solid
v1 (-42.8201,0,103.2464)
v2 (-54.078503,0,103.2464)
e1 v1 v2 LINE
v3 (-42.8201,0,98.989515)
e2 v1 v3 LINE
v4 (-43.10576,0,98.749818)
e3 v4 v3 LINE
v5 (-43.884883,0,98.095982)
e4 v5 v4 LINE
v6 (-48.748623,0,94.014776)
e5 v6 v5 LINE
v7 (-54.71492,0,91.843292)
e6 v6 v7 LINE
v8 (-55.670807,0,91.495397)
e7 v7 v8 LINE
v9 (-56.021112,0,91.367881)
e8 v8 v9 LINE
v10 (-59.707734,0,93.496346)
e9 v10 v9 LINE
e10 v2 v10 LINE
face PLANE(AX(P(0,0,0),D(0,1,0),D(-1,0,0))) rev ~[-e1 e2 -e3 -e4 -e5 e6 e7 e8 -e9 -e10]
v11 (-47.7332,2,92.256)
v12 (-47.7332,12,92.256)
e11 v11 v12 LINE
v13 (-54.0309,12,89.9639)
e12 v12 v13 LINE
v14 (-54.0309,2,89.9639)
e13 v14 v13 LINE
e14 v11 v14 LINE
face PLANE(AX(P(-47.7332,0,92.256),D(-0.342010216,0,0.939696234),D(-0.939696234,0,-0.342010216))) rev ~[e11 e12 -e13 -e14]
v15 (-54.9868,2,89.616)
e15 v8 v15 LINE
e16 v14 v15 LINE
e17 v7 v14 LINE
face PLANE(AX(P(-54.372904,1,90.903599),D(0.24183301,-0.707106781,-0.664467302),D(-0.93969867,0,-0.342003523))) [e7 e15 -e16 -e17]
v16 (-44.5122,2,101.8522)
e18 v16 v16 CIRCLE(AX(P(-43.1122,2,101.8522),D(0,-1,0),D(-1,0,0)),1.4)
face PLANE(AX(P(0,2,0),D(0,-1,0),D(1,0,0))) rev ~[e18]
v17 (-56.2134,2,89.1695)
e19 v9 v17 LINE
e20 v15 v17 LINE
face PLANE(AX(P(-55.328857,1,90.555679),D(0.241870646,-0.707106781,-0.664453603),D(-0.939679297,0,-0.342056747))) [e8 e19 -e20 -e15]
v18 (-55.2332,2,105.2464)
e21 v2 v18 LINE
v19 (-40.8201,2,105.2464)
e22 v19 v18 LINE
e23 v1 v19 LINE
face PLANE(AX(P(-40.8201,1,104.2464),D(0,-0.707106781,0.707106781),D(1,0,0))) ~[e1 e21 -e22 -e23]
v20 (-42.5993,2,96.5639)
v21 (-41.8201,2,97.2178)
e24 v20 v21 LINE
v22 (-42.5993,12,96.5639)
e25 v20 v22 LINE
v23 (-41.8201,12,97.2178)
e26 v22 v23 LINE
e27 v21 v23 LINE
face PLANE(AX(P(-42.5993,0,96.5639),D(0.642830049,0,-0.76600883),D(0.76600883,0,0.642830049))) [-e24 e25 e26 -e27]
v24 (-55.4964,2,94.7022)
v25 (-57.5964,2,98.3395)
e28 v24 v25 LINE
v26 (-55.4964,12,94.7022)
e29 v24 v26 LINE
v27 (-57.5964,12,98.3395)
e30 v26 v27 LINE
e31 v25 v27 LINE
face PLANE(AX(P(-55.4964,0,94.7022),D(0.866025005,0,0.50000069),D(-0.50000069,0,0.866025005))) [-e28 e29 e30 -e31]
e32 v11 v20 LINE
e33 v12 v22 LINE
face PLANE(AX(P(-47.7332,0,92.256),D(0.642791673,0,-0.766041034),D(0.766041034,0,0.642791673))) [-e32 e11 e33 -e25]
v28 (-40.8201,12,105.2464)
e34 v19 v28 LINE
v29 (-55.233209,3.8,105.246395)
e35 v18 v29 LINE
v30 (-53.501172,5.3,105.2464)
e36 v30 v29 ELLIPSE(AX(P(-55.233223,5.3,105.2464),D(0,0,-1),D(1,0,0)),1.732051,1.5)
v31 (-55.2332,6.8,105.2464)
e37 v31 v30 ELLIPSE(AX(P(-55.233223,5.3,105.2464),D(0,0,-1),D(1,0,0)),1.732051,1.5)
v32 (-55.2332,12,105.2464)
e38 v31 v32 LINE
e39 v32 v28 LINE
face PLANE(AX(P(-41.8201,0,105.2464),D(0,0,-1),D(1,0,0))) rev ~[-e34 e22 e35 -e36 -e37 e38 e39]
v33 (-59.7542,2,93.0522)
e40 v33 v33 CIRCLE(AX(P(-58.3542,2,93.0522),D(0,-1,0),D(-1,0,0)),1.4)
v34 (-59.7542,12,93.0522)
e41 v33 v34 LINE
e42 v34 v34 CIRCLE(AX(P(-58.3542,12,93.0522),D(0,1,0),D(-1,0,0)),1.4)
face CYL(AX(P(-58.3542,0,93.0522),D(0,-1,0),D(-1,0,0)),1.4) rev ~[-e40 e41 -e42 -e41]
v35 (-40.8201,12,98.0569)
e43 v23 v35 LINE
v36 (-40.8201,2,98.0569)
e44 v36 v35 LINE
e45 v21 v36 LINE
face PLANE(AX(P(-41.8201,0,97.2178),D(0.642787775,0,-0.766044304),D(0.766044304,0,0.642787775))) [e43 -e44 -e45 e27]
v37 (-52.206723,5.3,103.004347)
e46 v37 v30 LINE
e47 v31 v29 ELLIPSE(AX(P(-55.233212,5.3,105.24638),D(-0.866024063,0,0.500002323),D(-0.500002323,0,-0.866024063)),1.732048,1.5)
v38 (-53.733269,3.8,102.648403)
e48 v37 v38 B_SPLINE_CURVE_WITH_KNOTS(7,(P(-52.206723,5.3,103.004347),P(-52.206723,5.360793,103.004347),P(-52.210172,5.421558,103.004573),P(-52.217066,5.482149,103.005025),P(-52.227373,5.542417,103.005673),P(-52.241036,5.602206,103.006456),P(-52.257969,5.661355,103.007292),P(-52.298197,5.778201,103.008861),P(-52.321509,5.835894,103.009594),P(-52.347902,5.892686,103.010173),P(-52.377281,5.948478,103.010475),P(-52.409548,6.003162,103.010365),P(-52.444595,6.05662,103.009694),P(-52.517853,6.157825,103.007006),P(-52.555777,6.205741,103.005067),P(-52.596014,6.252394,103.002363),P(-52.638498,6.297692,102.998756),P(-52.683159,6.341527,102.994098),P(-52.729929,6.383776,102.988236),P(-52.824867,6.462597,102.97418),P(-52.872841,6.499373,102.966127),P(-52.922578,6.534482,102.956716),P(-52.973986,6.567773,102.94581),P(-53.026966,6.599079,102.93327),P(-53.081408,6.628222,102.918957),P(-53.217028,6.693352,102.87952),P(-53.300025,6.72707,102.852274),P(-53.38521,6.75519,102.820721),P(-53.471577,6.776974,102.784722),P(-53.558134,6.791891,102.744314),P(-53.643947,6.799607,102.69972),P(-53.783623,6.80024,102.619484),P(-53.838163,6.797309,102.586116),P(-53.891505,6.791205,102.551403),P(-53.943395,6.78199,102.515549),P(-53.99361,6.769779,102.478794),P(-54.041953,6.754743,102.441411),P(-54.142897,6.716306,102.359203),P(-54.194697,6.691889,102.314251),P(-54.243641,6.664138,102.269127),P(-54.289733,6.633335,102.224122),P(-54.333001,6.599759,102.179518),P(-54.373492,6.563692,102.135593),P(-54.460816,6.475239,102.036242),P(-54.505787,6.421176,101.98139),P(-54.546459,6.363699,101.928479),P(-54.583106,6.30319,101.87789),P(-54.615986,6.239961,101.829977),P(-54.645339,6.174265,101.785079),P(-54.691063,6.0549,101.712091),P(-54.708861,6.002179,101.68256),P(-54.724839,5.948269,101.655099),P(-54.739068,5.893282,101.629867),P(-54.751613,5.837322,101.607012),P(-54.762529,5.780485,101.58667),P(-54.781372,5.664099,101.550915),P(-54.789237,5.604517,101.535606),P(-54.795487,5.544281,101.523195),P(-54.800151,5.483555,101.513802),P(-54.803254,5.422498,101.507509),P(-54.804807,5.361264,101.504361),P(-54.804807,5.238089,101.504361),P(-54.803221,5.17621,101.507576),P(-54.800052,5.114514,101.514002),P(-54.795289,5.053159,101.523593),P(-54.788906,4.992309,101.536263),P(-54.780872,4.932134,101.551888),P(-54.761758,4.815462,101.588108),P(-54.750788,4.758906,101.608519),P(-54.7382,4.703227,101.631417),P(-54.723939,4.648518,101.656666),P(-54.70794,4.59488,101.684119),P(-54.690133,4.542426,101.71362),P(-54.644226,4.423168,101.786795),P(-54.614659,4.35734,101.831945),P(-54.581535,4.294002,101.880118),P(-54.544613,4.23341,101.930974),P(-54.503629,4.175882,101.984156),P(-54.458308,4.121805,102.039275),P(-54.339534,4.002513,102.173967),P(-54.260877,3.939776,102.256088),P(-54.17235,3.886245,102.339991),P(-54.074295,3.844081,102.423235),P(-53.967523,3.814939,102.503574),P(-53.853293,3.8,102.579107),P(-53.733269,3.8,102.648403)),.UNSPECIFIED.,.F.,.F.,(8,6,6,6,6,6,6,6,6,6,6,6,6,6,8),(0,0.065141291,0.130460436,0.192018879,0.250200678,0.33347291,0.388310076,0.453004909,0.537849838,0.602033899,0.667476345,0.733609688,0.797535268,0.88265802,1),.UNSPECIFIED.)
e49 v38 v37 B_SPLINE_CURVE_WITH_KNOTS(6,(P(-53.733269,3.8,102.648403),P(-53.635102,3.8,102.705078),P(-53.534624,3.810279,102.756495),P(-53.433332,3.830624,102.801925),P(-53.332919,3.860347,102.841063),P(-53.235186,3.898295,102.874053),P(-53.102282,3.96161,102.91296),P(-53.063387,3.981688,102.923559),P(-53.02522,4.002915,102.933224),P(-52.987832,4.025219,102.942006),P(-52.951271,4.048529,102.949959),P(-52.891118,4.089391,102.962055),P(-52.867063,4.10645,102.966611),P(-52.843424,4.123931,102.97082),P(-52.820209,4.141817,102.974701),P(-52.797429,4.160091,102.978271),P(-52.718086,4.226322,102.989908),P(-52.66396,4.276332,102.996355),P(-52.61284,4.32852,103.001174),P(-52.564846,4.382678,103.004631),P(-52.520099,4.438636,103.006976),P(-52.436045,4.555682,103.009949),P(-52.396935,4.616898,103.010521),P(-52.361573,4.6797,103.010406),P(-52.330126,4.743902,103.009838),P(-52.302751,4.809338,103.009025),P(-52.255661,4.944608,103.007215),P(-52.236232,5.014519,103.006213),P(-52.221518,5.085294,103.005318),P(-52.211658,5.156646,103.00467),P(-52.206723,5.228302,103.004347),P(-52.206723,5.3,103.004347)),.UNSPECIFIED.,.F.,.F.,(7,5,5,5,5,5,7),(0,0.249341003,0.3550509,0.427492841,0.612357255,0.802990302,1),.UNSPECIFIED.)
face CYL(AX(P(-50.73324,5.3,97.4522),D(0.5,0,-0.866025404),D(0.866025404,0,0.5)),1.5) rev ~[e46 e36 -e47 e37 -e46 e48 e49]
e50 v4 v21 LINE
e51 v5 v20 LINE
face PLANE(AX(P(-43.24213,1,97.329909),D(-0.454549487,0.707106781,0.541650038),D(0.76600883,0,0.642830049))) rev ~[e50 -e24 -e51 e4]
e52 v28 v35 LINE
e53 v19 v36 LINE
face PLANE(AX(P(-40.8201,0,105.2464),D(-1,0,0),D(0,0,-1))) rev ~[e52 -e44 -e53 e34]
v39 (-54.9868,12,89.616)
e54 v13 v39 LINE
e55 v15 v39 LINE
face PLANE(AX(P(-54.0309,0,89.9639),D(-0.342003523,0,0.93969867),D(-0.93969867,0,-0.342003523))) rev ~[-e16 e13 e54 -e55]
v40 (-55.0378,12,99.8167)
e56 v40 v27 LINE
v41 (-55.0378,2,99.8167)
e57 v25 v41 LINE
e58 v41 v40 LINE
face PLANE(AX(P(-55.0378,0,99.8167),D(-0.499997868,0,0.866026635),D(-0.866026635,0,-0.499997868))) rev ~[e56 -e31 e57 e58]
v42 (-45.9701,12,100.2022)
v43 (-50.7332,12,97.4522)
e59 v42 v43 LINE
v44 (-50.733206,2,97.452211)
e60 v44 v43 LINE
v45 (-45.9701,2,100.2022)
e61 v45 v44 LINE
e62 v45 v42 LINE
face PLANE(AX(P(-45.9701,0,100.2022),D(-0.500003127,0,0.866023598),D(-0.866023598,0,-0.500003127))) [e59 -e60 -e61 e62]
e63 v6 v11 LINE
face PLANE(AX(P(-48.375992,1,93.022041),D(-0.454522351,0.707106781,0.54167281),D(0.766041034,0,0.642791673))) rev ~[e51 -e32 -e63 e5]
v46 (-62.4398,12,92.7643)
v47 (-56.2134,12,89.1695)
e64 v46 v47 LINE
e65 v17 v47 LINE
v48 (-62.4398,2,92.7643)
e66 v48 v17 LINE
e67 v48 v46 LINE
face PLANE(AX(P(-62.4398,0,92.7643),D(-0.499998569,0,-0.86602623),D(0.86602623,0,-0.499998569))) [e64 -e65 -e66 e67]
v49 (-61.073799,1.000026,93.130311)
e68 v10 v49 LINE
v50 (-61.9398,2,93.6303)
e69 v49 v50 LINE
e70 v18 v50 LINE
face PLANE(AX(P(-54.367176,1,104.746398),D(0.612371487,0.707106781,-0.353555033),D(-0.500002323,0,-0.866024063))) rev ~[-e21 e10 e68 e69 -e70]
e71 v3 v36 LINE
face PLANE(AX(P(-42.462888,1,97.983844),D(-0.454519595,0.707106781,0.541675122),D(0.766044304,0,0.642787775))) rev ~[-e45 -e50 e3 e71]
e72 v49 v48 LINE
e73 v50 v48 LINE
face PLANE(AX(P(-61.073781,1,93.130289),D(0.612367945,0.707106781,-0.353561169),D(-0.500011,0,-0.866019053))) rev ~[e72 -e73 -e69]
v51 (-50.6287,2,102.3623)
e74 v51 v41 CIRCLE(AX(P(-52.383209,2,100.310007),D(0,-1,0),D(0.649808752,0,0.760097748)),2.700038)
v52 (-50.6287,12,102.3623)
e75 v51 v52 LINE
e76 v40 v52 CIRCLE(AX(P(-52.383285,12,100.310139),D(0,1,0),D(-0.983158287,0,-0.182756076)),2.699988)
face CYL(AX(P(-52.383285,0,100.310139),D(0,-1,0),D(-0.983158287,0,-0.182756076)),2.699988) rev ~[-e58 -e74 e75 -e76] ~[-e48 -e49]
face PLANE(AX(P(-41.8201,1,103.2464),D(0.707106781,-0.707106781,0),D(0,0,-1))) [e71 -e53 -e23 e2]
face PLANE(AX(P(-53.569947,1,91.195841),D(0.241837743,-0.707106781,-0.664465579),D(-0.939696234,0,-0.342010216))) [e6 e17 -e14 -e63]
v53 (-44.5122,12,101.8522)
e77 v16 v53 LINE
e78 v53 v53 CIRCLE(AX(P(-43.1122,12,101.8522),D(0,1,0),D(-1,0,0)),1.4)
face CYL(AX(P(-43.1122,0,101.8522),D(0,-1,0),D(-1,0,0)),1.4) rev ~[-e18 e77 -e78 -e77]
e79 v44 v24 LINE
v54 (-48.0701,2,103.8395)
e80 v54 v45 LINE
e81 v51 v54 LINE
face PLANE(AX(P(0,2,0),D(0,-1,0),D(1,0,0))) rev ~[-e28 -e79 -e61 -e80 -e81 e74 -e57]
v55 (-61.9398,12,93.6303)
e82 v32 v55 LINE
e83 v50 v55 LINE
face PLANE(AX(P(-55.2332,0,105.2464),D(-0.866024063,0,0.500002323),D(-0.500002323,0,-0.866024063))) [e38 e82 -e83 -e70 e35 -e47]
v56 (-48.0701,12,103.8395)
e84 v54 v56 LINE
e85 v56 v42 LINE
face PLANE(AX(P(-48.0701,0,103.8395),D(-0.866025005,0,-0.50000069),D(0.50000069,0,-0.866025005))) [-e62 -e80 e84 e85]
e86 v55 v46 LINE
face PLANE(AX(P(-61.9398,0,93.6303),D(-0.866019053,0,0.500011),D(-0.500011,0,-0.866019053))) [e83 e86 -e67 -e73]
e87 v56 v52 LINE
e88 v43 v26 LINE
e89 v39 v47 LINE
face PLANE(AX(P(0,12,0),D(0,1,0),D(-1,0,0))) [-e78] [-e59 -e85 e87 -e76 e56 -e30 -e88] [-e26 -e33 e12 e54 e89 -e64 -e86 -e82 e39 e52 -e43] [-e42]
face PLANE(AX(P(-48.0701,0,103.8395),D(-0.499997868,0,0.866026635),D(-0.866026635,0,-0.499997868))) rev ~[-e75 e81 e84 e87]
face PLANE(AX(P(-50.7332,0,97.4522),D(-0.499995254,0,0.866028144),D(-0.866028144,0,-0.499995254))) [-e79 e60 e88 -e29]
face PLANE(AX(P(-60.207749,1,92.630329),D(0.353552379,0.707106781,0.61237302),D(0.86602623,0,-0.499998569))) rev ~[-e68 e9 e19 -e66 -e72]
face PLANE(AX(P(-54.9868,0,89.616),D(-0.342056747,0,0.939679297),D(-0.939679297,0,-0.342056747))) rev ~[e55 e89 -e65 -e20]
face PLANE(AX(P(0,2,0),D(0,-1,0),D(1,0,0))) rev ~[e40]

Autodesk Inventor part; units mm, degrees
ref_plane "YZ Plane" through (0, 0, 0) normal (1, 0, 0) x (0, 1, 0)
ref_plane "XZ Plane" through (0, 0, 0) normal (0, 1, 0) x (-1, 0, 0)
ref_plane "XY Plane" through (0, 0, 0) normal (0, 0, 1) x (1, 0, 0)
sketch "Sketch1" plane through (0, 0, 0) normal (0, 1, 0) x (-1, 0, 0)
  line L0 (50.7332, 97.4522) -> (55.4964, 94.7022)
  line L1 (55.4964, 94.7022) -> (57.5964, 98.3395)
  line L2 (48.0701, 103.8395) -> (45.9701, 100.2022)
  line L3 (45.9701, 100.2022) -> (50.7332, 97.4522)
  arc A0 (55.0378, 99.8167) -> (50.6287, 102.3623) centre (52.3832, 100.3101) ccw
  line L4 (48.0701, 103.8395) -> (50.6287, 102.3623)
  line L5 (55.0378, 99.8167) -> (57.5964, 98.3395)
  line L6 (47.7332, 92.256) -> (54.0309, 89.9639)
  line L7 (47.7332, 92.256) -> (54.435, 92.256) construction
  line L8 (56.5464, 96.5209) -> (59.5464, 96.5209) construction
  line L9 (58.0464, 93.9228) -> (60.2464, 93.9228) construction
  line L10 (54.0309, 89.9639) -> (54.9868, 89.616)
  line L11 (55.2332, 105.2464) -> (61.9398, 93.6303)
  circle A1 centre (58.3542, 93.0522) radius 1.4
  line L12 (61.9398, 93.6303) -> (62.4398, 92.7643)
  line L13 (62.4398, 92.7643) -> (56.2134, 89.1695)
  line L14 (54.9868, 89.616) -> (56.2134, 89.1695)
  line L15 (47.7332, 92.256) -> (42.5993, 96.5639)
  line L16 (47.7332, 92.256) -> (44.3823, 98.06) construction
  line L17 (47.0201, 102.0209) -> (45.5201, 104.6189) construction
  line L18 (44.0201, 102.0209) -> (42.9201, 103.9261) construction
  line L19 (42.5993, 96.5639) -> (41.8201, 97.2178)
  line L20 (55.2332, 105.2464) -> (41.8201, 105.2464)
  circle A2 centre (43.1122, 101.8522) radius 1.4
  line L21 (41.8201, 105.2464) -> (40.8201, 105.2464)
  line L22 (40.8201, 105.2464) -> (40.8201, 98.0569)
  line L23 (41.8201, 97.2178) -> (40.8201, 98.0569)
  dimension "d8" = 20
  dimension "d26" = 2.8
  dimension "d27" = 1
  dimension "d31" = 2.8
extrude "Extrusion1" add sketch "Sketch1" along normal blind 12
sketch "Sketch3" plane through (0, 0, 0) normal (0, -1, 0) x (1, 0, 0)
  line L0 (-48.0701, 103.8395) -> (-45.9701, 100.2022) projected
  line L1 (-45.9701, 100.2022) -> (-55.4964, 94.7022) projected
  line L2 (-55.4964, 94.7022) -> (-57.5964, 98.3395) projected
  line L3 (-57.5964, 98.3395) -> (-55.0378, 99.8167) projected
  arc A0 (-50.6287, 102.3623) -> (-55.0378, 99.8167) centre (-52.3832, 100.3101) ccw projected
  line L4 (-50.6287, 102.3623) -> (-48.0701, 103.8395) projected
  line L5 (-55.2332, 105.2464) -> (-62.4398, 92.7643) projected
  line L6 (-56.2134, 89.1695) -> (-47.7332, 92.256) projected
  line L7 (-62.4398, 92.7643) -> (-56.2134, 89.1695) projected
  line L8 (-47.7332, 92.256) -> (-40.8201, 98.0569) projected
  line L9 (-40.8201, 98.0569) -> (-40.8201, 105.2464) projected
  line L10 (-40.8201, 105.2464) -> (-55.2332, 105.2464) projected
  circle A1 centre (-58.3542, 93.0522) radius 1.4 projected
  circle A2 centre (-43.1122, 101.8522) radius 1.4 projected
  point P0 (0, 0)
extrude "Extrusion2" add sketch "Sketch3" against normal blind 2 contours L0 L1 L2 L3 A0 L4 | A1 | A2
sketch "Sketch4" plane through (-45.9701, 2, 100.2022) normal (-0.5, 0, 0.8660254) x (0.8660254, 0, 0.5)
  line L0 (0, 0) -> (-5.5, 0)
  line L1 (-11, 0) -> (0, 0) projected
  line L2 (-5.5, 0) -> (-5.5, 3.3)
  circle A0 centre (-5.5, 3.3) radius 1.5
  point P0 (-10.2898, -2)
  dimension "d21" = 3.3
  dimension "d22" = 3
extrude "Extrusion3" cut sketch "Sketch4" along normal through all
chamfer "Chamfer2" distance 2 angle 45 6 edges at (-58.8365, 0, 99.0054) (-48.0267, 0, 105.2464) (-40.8201, 0, 101.6516) (-44.2767, 0, 95.1565) (-51.9733, 0, 90.7128) (-59.3266, 0, 90.9669)
properties part number "TSOP Holder Corner" material "ABS Plastic"
